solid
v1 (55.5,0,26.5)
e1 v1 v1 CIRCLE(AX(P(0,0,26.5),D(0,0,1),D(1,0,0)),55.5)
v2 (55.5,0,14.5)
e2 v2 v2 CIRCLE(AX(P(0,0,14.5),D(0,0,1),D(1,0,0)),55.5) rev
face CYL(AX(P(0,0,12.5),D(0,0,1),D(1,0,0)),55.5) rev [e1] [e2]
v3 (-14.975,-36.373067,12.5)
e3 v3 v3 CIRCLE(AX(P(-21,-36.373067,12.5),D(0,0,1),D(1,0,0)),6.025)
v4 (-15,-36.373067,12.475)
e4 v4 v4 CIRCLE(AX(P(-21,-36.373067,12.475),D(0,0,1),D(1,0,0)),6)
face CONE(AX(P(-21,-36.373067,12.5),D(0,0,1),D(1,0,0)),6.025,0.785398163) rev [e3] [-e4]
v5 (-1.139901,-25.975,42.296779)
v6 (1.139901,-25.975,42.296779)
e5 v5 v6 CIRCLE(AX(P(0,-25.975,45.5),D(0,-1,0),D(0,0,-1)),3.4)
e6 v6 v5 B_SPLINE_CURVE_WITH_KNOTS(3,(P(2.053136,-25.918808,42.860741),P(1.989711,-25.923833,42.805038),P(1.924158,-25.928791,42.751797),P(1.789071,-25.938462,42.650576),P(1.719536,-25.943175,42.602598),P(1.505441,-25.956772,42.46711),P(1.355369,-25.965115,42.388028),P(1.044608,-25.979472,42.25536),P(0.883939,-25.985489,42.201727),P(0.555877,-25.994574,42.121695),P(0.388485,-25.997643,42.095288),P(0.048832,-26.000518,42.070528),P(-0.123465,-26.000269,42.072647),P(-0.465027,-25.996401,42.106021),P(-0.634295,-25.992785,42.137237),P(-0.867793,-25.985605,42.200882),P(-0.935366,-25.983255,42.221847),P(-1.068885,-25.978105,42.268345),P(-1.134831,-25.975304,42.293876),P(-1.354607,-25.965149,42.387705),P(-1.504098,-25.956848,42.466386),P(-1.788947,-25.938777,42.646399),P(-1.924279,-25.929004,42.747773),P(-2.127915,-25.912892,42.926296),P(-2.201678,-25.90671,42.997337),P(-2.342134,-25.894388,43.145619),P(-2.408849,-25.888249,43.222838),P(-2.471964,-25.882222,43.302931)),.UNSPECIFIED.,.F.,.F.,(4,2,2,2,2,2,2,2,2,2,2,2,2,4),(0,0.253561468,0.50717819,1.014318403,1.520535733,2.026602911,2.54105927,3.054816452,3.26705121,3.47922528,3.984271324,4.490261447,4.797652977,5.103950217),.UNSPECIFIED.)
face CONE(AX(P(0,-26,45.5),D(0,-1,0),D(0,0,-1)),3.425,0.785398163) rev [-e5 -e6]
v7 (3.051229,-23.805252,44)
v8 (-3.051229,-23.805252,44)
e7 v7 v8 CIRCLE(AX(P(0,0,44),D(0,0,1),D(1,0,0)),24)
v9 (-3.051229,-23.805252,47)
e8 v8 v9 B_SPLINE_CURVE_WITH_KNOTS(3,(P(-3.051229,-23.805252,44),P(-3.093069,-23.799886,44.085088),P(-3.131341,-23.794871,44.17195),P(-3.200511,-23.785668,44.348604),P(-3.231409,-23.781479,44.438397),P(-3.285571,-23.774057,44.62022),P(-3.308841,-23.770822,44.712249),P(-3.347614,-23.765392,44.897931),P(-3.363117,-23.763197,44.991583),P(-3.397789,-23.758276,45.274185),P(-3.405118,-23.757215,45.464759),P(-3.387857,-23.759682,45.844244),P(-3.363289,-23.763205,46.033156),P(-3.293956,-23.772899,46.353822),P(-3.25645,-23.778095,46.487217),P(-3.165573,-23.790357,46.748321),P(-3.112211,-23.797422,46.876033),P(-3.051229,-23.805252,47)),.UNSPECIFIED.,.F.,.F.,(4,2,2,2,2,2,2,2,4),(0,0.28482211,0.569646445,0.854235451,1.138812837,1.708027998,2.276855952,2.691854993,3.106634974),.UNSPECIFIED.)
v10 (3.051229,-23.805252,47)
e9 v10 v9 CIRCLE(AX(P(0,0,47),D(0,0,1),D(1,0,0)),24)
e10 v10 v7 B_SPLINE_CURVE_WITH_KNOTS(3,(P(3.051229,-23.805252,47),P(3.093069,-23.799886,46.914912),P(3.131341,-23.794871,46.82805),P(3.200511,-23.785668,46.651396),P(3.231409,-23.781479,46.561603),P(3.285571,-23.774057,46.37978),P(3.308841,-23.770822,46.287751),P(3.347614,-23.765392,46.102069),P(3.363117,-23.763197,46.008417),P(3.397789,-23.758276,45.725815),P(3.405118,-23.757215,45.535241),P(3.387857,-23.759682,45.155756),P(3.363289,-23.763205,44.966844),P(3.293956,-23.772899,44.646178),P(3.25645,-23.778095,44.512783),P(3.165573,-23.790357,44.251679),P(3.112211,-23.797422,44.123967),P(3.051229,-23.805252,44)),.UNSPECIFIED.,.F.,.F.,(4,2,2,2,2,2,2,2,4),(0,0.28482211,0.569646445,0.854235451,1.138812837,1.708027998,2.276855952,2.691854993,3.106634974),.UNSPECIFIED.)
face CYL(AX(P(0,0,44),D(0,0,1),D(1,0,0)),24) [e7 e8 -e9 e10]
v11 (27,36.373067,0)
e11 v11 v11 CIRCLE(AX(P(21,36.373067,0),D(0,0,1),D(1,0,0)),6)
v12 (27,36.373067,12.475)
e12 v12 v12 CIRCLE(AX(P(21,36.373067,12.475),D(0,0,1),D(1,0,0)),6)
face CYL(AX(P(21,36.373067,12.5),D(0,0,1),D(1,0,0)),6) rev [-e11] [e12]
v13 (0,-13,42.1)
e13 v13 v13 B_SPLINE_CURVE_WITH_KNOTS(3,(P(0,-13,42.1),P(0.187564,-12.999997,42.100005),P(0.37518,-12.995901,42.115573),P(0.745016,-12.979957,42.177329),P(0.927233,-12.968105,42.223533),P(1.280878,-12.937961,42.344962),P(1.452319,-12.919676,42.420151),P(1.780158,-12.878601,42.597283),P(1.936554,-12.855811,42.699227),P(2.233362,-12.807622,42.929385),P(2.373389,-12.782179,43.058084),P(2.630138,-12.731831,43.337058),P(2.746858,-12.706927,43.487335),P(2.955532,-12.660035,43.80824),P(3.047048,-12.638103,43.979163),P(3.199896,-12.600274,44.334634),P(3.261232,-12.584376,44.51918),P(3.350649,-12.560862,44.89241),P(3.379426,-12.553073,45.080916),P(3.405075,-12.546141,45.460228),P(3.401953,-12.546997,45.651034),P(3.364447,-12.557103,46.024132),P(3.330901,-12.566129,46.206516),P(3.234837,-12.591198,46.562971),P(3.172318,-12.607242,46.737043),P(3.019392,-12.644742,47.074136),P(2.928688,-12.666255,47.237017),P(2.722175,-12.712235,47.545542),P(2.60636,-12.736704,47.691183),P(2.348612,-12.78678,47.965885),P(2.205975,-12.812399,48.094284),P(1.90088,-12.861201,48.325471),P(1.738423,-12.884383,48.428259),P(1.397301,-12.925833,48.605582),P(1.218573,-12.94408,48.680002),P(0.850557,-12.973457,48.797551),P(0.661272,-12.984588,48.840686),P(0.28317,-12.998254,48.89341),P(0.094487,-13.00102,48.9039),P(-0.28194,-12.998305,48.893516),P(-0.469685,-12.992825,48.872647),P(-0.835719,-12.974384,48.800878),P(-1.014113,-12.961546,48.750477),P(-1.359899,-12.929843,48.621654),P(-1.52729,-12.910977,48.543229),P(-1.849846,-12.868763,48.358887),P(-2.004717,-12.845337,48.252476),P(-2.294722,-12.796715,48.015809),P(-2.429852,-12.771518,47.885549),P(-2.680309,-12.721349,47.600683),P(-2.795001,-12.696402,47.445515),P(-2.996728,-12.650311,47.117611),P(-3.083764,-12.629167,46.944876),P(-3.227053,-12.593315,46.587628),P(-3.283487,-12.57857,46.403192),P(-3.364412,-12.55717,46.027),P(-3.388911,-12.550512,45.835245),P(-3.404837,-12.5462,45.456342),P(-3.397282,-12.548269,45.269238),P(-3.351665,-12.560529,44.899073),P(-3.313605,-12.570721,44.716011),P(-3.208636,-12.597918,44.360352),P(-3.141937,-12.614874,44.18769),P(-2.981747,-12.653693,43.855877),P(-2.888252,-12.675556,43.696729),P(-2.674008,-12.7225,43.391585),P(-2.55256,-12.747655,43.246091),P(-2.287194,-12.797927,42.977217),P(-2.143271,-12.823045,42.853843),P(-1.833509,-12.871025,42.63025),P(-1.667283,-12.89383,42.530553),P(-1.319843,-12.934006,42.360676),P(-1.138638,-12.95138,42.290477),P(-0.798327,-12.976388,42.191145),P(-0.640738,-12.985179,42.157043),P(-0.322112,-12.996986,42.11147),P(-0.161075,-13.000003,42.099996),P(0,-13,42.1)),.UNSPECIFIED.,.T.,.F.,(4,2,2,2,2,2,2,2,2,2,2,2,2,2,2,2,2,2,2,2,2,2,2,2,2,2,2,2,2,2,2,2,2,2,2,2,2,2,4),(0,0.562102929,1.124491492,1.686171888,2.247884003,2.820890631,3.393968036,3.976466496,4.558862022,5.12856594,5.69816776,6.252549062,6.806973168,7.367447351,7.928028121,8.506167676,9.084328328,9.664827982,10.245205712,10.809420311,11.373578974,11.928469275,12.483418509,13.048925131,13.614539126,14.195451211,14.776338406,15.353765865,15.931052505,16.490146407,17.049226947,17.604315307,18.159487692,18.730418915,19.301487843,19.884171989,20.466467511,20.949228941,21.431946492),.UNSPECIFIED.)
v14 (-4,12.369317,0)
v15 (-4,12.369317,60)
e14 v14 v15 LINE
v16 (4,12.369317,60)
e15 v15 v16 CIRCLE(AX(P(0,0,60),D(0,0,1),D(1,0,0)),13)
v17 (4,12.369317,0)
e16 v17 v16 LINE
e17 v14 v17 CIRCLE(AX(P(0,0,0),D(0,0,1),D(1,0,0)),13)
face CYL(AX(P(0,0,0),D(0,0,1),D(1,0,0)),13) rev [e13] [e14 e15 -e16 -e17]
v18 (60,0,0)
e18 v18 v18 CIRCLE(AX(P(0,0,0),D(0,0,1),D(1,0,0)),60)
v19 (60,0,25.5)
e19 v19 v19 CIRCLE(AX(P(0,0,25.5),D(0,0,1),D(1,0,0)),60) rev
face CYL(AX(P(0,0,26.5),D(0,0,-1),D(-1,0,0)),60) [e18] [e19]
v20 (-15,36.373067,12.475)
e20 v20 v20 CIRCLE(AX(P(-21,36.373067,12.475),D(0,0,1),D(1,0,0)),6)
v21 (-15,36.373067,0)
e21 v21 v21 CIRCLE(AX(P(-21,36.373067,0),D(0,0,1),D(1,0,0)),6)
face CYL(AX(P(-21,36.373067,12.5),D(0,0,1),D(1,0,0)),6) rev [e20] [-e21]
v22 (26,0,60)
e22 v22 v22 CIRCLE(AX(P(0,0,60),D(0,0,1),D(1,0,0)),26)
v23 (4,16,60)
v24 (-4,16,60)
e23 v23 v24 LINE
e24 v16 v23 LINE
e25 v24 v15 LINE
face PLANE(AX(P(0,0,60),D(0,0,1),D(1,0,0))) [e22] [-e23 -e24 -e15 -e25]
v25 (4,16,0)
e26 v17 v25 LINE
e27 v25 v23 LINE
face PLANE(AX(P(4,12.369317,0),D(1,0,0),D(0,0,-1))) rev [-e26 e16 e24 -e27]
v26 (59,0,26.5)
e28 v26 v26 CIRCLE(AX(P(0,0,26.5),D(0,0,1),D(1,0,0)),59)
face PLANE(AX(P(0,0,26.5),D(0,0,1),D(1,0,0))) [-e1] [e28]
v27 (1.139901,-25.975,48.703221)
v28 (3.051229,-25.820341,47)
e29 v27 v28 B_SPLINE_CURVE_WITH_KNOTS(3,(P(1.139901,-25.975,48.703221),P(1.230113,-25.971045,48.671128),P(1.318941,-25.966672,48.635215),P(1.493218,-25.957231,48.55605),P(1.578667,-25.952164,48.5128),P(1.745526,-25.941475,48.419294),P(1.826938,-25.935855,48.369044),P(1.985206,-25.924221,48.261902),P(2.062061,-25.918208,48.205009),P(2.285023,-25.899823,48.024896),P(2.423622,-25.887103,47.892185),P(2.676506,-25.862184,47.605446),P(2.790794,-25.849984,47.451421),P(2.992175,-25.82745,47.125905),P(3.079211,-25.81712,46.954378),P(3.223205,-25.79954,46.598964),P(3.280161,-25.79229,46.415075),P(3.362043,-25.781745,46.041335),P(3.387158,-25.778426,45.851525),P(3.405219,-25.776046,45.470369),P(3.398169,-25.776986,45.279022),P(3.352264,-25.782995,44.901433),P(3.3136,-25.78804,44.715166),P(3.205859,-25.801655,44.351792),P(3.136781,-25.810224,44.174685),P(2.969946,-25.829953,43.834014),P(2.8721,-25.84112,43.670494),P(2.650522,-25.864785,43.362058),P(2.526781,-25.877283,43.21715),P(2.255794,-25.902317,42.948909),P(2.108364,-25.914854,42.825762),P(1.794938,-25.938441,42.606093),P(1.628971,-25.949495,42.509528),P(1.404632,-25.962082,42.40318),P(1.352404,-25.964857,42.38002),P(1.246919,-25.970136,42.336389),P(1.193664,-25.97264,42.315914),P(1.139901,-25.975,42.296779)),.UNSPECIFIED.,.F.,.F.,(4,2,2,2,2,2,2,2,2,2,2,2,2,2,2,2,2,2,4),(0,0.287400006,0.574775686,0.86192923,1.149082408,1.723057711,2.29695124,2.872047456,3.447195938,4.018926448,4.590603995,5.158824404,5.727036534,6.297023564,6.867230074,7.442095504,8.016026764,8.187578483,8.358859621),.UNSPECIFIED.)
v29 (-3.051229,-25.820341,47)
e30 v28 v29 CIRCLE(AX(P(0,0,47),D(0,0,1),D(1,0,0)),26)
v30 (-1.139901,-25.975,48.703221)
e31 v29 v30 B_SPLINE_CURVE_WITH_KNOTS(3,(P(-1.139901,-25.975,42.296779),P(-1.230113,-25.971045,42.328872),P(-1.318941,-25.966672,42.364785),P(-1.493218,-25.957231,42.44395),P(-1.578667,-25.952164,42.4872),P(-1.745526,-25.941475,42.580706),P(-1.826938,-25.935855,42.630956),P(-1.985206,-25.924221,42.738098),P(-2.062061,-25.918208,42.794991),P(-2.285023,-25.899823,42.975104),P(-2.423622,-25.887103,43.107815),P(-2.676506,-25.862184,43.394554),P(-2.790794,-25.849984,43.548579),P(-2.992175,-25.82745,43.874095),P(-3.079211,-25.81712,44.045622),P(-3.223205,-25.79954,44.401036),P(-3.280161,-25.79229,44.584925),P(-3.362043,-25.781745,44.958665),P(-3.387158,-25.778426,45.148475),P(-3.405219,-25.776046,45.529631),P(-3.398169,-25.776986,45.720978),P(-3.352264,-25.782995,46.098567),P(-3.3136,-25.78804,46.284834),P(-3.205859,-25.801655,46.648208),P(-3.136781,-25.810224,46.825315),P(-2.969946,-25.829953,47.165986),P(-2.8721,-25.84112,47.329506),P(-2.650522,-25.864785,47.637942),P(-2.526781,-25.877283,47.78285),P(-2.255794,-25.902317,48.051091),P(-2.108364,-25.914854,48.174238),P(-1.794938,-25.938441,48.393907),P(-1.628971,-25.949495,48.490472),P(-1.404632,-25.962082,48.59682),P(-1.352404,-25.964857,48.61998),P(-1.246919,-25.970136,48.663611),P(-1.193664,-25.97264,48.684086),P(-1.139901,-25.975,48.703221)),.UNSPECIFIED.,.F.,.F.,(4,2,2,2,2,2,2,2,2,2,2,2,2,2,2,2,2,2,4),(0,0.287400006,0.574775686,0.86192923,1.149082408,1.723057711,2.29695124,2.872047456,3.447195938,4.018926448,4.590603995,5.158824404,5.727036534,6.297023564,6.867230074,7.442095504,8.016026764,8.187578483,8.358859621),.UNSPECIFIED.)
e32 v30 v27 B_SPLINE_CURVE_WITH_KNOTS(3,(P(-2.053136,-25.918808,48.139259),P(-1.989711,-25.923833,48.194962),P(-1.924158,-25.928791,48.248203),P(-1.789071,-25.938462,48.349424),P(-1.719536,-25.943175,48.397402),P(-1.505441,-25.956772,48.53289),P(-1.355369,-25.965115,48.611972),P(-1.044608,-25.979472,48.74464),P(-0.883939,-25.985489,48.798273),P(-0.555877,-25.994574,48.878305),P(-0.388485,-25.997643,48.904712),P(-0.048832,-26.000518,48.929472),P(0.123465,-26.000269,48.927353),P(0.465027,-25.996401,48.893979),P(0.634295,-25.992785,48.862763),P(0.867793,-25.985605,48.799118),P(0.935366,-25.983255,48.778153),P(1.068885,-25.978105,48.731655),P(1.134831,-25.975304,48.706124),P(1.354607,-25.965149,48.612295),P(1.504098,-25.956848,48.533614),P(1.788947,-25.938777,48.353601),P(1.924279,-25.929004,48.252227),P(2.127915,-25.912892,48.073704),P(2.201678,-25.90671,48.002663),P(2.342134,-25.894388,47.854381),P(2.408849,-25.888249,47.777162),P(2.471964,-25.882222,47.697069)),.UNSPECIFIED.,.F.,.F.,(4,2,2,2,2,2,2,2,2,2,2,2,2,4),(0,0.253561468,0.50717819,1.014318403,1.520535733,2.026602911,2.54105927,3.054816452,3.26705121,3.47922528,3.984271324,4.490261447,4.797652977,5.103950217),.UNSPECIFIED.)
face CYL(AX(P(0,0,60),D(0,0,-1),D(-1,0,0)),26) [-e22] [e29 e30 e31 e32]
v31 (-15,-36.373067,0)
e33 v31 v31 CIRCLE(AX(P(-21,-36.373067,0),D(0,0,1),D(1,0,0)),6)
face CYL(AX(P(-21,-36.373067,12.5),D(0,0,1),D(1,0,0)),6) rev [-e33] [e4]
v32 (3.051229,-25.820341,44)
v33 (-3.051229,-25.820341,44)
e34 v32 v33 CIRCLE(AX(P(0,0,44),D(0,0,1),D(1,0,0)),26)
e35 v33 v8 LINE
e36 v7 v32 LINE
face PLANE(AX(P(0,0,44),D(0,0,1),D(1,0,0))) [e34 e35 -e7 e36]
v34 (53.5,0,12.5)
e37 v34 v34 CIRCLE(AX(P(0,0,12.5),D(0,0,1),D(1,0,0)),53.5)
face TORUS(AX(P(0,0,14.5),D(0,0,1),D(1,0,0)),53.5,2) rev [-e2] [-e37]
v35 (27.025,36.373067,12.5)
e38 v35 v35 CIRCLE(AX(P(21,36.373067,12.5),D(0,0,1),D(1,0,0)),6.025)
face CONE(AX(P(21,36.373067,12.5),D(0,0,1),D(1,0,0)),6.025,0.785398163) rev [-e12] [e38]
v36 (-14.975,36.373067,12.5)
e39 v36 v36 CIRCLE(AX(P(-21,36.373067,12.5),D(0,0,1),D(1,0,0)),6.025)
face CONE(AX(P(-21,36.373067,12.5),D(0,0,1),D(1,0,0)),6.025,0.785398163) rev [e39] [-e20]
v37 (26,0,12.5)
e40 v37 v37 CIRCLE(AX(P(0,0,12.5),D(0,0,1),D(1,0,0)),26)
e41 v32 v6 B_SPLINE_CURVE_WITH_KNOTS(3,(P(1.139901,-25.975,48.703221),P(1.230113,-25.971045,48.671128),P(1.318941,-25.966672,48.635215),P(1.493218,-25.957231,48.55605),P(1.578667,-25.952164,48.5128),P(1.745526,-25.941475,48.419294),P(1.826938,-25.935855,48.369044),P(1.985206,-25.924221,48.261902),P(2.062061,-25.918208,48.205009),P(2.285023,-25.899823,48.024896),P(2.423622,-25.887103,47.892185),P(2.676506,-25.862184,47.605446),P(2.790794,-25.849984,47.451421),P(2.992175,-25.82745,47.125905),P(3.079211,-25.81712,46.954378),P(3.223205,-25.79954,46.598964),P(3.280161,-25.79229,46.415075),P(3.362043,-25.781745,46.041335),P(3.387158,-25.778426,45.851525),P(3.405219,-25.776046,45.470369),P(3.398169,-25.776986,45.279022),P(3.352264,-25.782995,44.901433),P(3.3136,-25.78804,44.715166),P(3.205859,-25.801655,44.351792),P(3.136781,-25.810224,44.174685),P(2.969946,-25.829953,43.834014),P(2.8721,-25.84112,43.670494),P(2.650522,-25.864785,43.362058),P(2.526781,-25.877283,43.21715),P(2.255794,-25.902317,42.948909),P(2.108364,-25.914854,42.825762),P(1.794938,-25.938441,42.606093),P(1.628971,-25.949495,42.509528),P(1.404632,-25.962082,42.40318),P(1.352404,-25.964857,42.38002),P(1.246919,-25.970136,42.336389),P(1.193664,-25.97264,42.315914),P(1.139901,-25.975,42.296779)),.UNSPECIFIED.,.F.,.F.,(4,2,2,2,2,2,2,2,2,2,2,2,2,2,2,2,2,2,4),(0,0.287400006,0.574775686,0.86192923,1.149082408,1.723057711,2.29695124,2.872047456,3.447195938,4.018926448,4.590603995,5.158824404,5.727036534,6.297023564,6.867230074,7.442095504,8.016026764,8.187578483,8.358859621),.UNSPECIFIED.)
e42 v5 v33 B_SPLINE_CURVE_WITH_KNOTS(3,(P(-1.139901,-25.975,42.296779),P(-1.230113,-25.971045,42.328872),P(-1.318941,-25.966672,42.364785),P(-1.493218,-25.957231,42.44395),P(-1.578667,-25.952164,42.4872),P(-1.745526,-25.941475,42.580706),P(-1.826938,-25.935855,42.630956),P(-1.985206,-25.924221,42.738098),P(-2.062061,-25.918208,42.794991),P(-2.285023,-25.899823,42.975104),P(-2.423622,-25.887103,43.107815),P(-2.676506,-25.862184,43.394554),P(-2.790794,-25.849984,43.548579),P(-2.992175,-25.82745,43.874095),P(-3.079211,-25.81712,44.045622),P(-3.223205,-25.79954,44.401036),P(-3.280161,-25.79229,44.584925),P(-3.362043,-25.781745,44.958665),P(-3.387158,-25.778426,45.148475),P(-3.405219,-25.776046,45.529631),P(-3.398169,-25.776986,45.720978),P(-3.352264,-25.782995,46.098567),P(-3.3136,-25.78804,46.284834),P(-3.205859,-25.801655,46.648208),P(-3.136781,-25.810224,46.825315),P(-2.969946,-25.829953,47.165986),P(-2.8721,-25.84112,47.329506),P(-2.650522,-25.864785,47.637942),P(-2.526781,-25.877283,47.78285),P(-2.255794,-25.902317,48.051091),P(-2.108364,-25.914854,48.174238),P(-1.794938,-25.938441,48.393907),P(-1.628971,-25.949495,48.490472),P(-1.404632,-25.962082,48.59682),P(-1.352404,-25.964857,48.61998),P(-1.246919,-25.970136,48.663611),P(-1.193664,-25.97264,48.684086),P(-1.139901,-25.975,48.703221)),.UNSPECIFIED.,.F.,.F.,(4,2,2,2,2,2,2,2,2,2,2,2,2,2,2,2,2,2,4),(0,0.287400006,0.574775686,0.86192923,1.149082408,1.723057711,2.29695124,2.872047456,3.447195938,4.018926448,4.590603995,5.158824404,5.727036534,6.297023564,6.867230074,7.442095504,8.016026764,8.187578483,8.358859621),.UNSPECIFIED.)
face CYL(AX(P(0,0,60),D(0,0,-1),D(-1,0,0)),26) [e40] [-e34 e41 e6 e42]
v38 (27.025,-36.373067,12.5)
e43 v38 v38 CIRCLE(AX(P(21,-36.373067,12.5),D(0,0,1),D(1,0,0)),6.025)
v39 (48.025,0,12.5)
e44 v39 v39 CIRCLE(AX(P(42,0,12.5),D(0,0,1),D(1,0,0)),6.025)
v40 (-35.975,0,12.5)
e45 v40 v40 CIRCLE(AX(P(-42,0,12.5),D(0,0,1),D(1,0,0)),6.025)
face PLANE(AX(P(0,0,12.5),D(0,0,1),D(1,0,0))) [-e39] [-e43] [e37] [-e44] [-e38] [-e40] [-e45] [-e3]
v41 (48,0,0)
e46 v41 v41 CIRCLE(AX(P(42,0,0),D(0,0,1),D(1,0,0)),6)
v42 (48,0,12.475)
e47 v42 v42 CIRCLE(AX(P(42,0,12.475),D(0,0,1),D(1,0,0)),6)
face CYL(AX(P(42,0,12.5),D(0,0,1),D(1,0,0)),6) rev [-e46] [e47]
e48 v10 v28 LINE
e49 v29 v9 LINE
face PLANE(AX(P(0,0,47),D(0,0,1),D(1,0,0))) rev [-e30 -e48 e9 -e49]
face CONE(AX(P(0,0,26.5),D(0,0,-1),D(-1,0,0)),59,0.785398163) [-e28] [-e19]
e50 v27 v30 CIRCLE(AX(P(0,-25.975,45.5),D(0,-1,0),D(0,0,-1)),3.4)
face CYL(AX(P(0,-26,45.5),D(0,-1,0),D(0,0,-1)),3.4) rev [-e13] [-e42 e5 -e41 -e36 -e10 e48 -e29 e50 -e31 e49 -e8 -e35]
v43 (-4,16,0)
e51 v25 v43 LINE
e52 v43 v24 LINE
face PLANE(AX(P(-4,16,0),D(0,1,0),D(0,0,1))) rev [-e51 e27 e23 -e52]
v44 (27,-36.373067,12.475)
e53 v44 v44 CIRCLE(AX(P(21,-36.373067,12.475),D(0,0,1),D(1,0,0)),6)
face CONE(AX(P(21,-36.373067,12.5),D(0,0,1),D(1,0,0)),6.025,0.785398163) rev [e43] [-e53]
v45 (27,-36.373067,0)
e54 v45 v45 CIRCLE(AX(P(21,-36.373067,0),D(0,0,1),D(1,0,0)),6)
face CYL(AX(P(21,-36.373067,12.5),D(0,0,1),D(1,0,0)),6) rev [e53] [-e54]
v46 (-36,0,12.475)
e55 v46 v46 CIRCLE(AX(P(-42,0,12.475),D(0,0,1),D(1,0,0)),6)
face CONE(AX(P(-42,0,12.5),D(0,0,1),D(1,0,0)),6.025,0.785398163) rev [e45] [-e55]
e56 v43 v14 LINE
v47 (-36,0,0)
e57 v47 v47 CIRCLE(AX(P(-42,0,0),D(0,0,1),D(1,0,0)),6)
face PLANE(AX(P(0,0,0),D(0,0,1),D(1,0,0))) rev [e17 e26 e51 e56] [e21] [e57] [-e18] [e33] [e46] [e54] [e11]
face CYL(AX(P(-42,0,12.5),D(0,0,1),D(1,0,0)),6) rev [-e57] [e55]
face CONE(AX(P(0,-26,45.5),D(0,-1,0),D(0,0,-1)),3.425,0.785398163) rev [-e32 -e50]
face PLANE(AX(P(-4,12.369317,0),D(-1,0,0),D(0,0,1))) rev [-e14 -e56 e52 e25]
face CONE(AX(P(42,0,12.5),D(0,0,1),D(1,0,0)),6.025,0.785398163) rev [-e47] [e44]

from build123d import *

# Parameters (mm, degrees)
SKETCH_1_R                        = 60
EXTRUDE_1_DEPTH                   = 26.5
SKETCH_2_R                        = 26
EXTRUDE_2_DEPTH                   = 60
CUT_EXTRUDE_START                 = -14
SKETCH_3_R                        = 55.5
SKETCH_3_R_2                      = 26
CUT_EXTRUDE_1_DEPTH               = 14
CUT_EXTRUDE_2_DEPTH               = 104.923048454
CUT_EXTRUDE_START_2               = -16
SKETCH_5_R                        = 26
SKETCH_5_R_2                      = 24
CUT_EXTRUDE_3_DEPTH               = 3
HOLE_WIZARD_12_0_12_1_D           = 12
HOLE_WIZARD_12_0_12_1_CSINK_D     = 12.05
HOLE_WIZARD_12_0_12_1_CSINK_ANGLE = 90
CHAMFER_1_SIZE                    = 1
FILLET_1_R                        = 2


# Read off the part's stored shape, not the designer's step: M8 螺纹孔的螺纹孔钻头1
with BuildPart() as part:
    # 草图1 → 凸台-拉伸1 (new body)
    with BuildSketch(Plane.XY):
        Circle(SKETCH_1_R)
    extrude(amount=EXTRUDE_1_DEPTH)

    # 草图2 → 凸台-拉伸2 (add)
    with BuildSketch(Plane.XY):
        Circle(SKETCH_2_R)
    extrude(amount=EXTRUDE_2_DEPTH)

    # 草图3 → 切除-拉伸1 (cut)
    with BuildSketch(Plane.XY.offset(26.5).offset(CUT_EXTRUDE_START)):
        Circle(SKETCH_3_R)
        Circle(SKETCH_3_R_2, mode=Mode.SUBTRACT)
    extrude(amount=CUT_EXTRUDE_1_DEPTH, mode=Mode.SUBTRACT)

    # 草图4 → 切除-拉伸2 (cut, through all)
    with BuildSketch(Plane.XY.offset(60)):
        with BuildLine():
            Line((-4, 12.369316877), (-4, 16))
            Line((-4, 16), (4, 16))
            Line((4, 16), (4, 12.369316877))
            ThreePointArc((4, 12.369316877), (0, -13), (-4, 12.369316877))
        make_face()
    extrude(amount=-CUT_EXTRUDE_2_DEPTH, mode=Mode.SUBTRACT)

    # M8 螺纹孔的螺纹孔钻头1 outline → M8 螺纹孔的螺纹孔钻头1 (revolve, cut)
    with BuildSketch(Plane.XY.offset(45.5)):
        Polygon((0, -26.000014008), (3.425014008, -26.000014008), (3.399999801, -25.974999801), (3.4, -12.54744384), (0, -12.54744384), align=None)
    revolve(axis=Axis((0, 0, 45.5), (0, 1, 0)), mode=Mode.SUBTRACT)

    # 草图5 → 切除-拉伸3 (cut)
    with BuildSketch(Plane.XY.offset(60).offset(CUT_EXTRUDE_START_2)):
        with Locations(Location((0, 0, 0), (0, 0, 263.260542122))):
            Circle(SKETCH_5_R)
        Circle(SKETCH_5_R_2, mode=Mode.SUBTRACT)
    extrude(amount=CUT_EXTRUDE_3_DEPTH, mode=Mode.SUBTRACT)

    # Ø12.0 (12) 直径孔1 (through all)
    with Locations(Plane.XY.offset(12.5)):
        with Locations((21, 36.373066959), (42, 0), (21, -36.373066959), (-21, -36.373066959), (-42, 0), (-21, 36.373066959)):
            CounterSinkHole(HOLE_WIZARD_12_0_12_1_D / 2, HOLE_WIZARD_12_0_12_1_CSINK_D / 2, counter_sink_angle=HOLE_WIZARD_12_0_12_1_CSINK_ANGLE)

    # 倒角1
    chamfer_1_edges = [part.edges().sort_by_distance(p)[0] for p in [
        (-60, 0, 26.5),
    ]]
    chamfer(chamfer_1_edges, length=CHAMFER_1_SIZE)

    # 圆角1
    fillet_1_edges = [part.edges().sort_by_distance(p)[0] for p in [
        (-55.5, 0, 12.5),
    ]]
    fillet(fillet_1_edges, radius=FILLET_1_R)


solid = part.part
